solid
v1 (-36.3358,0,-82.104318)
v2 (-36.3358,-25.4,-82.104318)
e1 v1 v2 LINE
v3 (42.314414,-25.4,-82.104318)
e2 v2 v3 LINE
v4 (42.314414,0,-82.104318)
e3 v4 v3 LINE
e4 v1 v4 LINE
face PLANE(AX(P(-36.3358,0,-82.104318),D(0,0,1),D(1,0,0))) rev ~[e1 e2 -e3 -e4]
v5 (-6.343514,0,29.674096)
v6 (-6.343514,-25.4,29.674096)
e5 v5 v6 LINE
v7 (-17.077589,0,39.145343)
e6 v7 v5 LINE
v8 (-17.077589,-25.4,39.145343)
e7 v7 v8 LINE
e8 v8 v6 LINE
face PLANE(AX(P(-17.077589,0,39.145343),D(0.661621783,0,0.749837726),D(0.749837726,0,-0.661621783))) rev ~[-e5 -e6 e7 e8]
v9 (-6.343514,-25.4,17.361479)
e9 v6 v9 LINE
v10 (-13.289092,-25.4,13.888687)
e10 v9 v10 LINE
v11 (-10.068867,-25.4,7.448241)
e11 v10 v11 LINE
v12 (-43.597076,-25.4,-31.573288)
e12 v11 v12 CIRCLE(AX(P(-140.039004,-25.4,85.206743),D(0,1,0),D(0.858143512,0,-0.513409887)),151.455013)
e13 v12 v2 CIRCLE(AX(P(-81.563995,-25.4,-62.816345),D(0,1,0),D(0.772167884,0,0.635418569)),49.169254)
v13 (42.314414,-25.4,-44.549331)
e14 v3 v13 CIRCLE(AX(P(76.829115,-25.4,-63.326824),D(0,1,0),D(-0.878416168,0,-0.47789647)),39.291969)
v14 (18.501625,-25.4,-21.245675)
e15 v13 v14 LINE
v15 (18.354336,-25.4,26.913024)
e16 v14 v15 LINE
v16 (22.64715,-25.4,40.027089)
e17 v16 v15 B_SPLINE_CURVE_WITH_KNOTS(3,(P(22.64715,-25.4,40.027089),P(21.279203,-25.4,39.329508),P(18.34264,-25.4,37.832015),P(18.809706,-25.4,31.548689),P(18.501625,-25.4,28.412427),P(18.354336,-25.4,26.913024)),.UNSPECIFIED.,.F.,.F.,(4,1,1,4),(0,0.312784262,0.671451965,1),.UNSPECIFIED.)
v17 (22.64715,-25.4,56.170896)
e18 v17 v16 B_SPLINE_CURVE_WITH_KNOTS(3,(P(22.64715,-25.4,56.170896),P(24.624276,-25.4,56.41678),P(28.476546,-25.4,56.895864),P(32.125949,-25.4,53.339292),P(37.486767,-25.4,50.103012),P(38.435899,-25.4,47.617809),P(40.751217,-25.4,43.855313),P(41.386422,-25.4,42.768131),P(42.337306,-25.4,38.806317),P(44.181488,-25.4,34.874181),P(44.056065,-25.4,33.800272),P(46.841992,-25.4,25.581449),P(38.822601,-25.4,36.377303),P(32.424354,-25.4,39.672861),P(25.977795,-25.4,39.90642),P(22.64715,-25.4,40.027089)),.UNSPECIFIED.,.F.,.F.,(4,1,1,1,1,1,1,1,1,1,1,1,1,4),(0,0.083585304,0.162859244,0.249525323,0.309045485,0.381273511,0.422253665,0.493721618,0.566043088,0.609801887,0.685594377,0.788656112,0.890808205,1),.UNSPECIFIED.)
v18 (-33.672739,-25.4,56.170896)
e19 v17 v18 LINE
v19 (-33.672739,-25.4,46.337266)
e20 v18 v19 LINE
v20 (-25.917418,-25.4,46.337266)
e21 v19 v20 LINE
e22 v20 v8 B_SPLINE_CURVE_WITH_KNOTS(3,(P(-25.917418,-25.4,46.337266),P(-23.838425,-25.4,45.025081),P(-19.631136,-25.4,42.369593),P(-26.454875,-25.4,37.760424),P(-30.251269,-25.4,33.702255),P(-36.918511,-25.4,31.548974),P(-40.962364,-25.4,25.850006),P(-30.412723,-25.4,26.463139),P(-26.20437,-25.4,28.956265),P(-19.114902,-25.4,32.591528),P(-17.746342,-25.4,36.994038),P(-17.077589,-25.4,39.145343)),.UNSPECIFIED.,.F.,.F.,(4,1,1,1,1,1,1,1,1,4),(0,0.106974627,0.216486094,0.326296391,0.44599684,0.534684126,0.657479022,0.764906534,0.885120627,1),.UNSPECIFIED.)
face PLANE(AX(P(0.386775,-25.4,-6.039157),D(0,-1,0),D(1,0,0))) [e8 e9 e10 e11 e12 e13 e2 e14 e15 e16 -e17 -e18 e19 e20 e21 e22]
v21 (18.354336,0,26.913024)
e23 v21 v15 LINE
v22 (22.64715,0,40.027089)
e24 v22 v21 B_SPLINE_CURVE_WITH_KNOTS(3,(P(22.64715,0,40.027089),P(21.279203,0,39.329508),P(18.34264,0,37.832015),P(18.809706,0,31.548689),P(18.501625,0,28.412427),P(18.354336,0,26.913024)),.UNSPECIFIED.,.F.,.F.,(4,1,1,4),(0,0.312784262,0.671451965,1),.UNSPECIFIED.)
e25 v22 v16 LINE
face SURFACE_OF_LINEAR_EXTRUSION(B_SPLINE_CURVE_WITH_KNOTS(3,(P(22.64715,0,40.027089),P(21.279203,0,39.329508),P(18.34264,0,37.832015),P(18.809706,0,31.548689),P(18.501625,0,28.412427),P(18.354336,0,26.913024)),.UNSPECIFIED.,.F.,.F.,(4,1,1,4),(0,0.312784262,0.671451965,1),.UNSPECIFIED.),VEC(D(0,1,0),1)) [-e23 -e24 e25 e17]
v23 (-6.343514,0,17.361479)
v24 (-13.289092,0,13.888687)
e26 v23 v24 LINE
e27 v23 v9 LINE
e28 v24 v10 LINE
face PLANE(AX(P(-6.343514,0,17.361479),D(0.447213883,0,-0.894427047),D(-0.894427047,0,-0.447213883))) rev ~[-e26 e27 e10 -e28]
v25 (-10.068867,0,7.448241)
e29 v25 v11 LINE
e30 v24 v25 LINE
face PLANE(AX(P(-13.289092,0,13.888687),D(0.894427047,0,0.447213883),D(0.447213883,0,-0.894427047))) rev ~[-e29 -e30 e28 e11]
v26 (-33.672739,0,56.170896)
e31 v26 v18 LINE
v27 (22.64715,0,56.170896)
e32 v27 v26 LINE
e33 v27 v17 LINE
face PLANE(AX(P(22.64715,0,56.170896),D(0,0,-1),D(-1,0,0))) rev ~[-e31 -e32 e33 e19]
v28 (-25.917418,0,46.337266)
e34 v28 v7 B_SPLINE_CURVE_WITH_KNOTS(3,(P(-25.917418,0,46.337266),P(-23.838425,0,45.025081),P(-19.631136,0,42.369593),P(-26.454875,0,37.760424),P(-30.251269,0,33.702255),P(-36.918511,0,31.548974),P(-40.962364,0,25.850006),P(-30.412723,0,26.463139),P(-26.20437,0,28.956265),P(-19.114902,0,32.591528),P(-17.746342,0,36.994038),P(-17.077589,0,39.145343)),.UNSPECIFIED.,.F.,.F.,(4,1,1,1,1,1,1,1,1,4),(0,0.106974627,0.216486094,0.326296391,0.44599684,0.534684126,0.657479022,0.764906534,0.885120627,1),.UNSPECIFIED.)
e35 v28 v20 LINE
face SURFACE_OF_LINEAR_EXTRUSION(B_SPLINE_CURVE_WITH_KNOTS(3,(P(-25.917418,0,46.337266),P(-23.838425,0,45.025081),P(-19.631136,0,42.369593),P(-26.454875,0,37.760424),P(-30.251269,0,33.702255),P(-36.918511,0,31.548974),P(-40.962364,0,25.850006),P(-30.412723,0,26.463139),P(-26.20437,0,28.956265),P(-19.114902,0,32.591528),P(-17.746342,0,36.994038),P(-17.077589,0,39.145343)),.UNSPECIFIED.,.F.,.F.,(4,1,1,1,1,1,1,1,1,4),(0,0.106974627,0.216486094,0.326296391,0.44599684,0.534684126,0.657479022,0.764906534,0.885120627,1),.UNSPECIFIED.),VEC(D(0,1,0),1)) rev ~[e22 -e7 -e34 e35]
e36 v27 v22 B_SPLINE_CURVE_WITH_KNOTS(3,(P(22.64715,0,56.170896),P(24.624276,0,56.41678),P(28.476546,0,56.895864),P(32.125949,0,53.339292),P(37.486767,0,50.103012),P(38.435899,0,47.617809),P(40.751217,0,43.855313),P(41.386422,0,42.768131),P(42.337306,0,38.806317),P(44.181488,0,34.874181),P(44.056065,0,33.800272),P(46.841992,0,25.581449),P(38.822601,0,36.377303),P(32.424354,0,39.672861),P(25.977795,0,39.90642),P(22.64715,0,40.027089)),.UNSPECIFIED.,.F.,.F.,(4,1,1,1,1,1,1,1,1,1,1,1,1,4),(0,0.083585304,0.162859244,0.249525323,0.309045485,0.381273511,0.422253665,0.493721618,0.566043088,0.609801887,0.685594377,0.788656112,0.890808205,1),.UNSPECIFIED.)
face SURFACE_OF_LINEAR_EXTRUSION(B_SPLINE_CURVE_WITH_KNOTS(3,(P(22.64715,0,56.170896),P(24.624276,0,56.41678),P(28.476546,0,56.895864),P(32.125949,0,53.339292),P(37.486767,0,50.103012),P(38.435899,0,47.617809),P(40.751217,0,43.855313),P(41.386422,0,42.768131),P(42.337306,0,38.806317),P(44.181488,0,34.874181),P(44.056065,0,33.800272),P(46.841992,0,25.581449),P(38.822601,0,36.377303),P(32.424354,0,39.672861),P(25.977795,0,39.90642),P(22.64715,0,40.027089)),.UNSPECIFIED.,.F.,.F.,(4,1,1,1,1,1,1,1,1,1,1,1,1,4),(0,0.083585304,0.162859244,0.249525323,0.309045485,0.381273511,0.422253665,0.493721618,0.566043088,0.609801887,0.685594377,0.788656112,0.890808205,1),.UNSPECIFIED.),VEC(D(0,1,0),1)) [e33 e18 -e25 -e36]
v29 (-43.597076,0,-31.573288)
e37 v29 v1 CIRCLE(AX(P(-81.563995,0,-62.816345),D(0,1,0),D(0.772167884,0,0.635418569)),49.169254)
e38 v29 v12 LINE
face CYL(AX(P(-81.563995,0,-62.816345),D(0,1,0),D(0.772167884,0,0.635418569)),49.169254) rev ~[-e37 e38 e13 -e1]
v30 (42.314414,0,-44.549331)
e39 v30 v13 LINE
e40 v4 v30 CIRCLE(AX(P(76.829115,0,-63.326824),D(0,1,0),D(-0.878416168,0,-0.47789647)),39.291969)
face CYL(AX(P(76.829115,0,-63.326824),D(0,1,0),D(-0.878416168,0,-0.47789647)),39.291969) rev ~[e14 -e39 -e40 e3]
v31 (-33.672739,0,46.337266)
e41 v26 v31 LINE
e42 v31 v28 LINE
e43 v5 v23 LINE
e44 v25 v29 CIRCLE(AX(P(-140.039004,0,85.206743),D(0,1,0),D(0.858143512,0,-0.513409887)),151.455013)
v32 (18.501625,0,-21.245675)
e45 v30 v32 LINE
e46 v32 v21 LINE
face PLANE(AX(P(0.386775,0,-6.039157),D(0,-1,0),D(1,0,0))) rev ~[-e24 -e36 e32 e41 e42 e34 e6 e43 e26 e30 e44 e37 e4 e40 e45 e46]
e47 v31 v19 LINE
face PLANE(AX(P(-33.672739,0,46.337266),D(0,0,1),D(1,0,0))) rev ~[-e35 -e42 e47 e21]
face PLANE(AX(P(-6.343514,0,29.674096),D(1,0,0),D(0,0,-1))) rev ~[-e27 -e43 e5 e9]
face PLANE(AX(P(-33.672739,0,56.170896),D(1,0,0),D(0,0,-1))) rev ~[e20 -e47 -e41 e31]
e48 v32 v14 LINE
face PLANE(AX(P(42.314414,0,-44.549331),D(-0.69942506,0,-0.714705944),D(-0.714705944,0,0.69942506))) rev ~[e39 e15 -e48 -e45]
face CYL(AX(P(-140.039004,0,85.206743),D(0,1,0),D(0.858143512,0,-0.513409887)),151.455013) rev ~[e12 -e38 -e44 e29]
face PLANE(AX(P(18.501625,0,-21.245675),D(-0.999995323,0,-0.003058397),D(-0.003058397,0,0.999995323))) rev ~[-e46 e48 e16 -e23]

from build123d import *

# Parameters (mm, degrees)
F1_DEPTH = 25.4


with BuildPart() as f1:
    # F0 (on Front) → F1 (new body)
    with BuildSketch(Plane.XZ):
        with BuildLine():
            Line((22.6471498609, 56.1708956957), (-33.6727388203, 56.1708956957))
            Line((-33.6727388203, 56.1708956957), (-33.6727388203, 46.3372655213))
            Line((-33.6727388203, 46.3372655213), (-25.9174183011, 46.3372655213))
            add(Edge.make_bspline(
                [(-25.9174183011, 46.3372655213), (-23.8384248423, 45.0250805606), (-19.6311358124, 42.3695929412), (-26.4548745148, 37.7604244944), (-30.251269397, 33.7022554926), (-36.9185112274, 31.5489744559), (-40.9623640059, 25.8500064631), (-30.4127234084, 26.4631393418), (-26.2043699608, 28.9562646016), (-19.1149018323, 32.5915279181), (-17.7463418011, 36.9940384372), (-17.0775894076, 39.1453430057)],
                knots=[0, 0, 0, 0, 0.1069746269, 0.2164860944, 0.326296391, 0.4459968404, 0.5346841258, 0.6574790218, 0.7649065343, 0.8851206273, 1, 1, 1, 1], degree=3))
            Line((-17.0775894076, 39.1453430057), (-6.3435137272, 29.674096033))
            Line((-6.3435137272, 29.674096033), (-6.3435137272, 17.36147888))
            Line((-6.3435137272, 17.36147888), (-13.2890921086, 13.8886868954))
            Line((-13.2890921086, 13.8886868954), (-10.0688668171, 7.4482414939))
            ThreePointArc((-10.0688668171, 7.4482414939), (-25.1639599361, -13.4965769846), (-43.5970760882, -31.5732881427))
            ThreePointArc((-43.5970760882, -31.5732881427), (-32.8946720473, -55.8225948104), (-36.3357998431, -82.1043178439))
            Line((-36.3357998431, -82.1043178439), (42.3144139349, -82.1043178439))
            ThreePointArc((42.3144139349, -82.1043178439), (37.5371457467, -63.3268244565), (42.3144139349, -44.549331069))
            Line((42.3144139349, -44.549331069), (18.5016249106, -21.2456751615))
            Line((18.5016249106, -21.2456751615), (18.3543357998, 26.9130244851))
            add(Edge.make_bspline(
                [(22.6471498609, 40.027089417), (21.2792029286, 39.3295081026), (18.3426400433, 37.8320147795), (18.8097058732, 31.5486892751), (18.5016249106, 28.412426806), (18.3543357998, 26.9130244851)],
                knots=[0, 0, 0, 0, 0.3127842622, 0.6714519647, 1, 1, 1, 1], degree=3))
            add(Edge.make_bspline(
                [(22.6471498609, 56.1708956957), (24.6242757207, 56.4167795131), (28.4765464917, 56.8958643616), (32.1259487873, 53.3392921925), (37.4867669651, 50.1030116949), (38.4358992651, 47.6178089471), (40.751216997, 43.8553132507), (41.3864216625, 42.7681305631), (42.337306284, 38.8063167025), (44.181487922, 34.8741808016), (44.0560653004, 33.8002724839), (46.8419924844, 25.5814490103), (38.8226009812, 36.3773031204), (32.4243539132, 39.6728607383), (25.9777945234, 39.9064199647), (22.6471498609, 40.027089417)],
                knots=[0, 0, 0, 0, 0.0835853039, 0.1628592441, 0.2495253229, 0.3090454849, 0.3812735114, 0.4222536655, 0.4937216176, 0.5660430876, 0.6098018867, 0.6855943774, 0.7886561121, 0.8908082049, 1, 1, 1, 1], degree=3))
        make_face()
    extrude(amount=F1_DEPTH)


solid = f1.part
